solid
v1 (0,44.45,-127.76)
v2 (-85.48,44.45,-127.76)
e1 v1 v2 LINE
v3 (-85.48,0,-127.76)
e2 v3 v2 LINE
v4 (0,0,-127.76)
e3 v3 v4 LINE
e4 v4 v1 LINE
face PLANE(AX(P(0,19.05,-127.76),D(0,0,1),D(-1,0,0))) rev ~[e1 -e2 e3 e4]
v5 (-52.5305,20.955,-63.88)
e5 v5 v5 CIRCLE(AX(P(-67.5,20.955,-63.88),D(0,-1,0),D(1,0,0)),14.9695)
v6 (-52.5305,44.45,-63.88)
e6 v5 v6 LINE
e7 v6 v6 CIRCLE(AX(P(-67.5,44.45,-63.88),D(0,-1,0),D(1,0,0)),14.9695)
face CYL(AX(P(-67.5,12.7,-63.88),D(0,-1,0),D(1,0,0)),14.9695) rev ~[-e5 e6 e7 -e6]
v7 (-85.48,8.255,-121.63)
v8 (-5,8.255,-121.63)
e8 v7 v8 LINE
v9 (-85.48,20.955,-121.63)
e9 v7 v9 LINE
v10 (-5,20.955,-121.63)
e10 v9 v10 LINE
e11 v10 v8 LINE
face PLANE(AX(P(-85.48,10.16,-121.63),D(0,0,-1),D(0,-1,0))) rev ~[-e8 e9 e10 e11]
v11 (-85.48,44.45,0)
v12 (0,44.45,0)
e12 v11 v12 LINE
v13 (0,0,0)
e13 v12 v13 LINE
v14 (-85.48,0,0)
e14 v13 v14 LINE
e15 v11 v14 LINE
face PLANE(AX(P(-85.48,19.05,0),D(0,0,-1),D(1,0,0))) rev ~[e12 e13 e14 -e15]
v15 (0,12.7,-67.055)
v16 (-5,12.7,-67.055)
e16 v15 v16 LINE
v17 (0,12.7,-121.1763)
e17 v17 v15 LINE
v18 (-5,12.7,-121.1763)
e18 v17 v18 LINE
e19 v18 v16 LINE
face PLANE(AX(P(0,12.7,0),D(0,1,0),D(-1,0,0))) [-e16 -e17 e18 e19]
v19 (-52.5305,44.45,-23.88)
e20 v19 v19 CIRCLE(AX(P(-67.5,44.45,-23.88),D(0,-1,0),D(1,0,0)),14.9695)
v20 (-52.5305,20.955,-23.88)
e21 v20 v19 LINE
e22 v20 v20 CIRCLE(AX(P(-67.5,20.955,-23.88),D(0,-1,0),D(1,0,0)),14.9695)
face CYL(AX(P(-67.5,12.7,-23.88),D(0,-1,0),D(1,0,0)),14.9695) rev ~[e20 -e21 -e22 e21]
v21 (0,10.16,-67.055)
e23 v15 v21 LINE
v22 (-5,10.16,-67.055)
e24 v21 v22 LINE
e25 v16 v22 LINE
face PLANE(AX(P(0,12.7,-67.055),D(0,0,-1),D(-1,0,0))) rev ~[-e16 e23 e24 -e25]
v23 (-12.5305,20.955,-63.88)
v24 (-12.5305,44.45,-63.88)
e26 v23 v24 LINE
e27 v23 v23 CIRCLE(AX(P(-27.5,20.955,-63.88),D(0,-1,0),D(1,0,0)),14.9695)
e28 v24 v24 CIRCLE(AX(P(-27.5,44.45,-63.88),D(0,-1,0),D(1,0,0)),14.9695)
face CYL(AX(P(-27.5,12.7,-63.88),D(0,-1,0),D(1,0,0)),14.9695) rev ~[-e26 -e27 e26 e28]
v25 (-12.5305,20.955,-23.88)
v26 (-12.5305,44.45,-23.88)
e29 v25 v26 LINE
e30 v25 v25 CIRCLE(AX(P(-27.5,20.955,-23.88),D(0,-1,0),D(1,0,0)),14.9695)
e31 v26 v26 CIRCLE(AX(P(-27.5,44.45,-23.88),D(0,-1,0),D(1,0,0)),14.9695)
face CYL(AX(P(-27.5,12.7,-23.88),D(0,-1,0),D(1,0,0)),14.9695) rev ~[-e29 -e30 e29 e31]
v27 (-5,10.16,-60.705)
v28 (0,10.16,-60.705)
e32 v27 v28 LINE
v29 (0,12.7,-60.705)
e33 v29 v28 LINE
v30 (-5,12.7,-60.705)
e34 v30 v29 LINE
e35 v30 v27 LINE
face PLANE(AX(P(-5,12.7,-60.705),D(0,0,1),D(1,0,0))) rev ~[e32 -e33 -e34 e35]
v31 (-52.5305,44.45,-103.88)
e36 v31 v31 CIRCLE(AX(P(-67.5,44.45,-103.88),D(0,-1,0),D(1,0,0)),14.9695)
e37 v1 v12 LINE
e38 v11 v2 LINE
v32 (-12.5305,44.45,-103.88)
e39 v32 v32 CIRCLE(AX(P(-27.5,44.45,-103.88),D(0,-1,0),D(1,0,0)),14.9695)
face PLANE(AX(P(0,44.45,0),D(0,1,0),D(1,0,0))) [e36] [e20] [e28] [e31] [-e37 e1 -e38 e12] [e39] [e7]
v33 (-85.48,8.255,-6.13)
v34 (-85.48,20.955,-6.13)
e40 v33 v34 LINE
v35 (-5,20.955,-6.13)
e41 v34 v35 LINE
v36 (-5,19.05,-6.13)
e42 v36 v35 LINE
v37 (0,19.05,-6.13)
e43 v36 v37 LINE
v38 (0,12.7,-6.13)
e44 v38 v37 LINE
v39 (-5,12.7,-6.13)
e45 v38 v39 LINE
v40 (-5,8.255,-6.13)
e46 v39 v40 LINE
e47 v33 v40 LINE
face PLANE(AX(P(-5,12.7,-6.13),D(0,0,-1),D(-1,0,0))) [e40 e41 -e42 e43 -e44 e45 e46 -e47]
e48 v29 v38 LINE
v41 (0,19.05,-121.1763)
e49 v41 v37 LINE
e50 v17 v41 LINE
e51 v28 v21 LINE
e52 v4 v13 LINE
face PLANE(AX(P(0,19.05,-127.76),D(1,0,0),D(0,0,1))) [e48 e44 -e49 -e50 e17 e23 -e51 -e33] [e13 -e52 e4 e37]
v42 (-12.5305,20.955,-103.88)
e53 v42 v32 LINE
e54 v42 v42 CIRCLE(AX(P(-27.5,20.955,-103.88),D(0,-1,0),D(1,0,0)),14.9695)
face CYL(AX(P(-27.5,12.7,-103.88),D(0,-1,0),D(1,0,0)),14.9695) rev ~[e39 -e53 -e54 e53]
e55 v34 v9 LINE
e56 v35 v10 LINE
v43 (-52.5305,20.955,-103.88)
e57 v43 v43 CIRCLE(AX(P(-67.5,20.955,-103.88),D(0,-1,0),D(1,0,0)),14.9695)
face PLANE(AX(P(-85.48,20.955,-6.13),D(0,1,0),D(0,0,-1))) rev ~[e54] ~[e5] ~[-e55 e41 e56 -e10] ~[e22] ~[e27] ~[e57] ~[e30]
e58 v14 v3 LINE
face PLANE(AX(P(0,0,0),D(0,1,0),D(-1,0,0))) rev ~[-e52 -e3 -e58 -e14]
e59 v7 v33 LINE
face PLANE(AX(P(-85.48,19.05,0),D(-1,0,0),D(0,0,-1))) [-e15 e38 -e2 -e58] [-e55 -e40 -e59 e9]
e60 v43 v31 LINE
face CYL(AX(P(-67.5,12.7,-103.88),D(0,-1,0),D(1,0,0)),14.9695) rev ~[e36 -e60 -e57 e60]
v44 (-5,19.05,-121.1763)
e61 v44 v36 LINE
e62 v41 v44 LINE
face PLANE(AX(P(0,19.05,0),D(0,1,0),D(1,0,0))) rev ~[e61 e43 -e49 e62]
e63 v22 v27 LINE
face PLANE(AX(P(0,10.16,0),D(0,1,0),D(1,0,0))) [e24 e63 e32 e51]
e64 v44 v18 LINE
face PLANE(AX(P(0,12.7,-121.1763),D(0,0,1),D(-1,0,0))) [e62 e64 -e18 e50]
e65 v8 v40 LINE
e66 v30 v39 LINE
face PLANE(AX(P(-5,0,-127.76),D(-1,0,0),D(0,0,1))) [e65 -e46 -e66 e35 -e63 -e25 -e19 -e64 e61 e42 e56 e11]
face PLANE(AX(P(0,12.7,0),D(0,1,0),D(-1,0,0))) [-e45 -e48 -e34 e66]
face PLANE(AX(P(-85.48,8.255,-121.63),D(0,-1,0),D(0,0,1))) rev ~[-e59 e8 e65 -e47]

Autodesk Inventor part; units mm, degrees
ref_plane "YZ Plane" through (0, 0, 0) normal (1, 0, 0) x (0, 1, 0)
ref_plane "XZ Plane" through (0, 0, 0) normal (0, 1, 0) x (-1, 0, 0)
ref_plane "XY Plane" through (0, 0, 0) normal (0, 0, 1) x (1, 0, 0)
sketch "Sketch1" plane through (0, 0, 0) normal (0, 1, 0) x (-1, 0, 0)
  line L0 (0, 0) -> (85.48, 0)
  line L1 (85.48, 0) -> (85.48, -127.76)
  line L2 (85.48, -127.76) -> (0, -127.76)
  line L3 (0, -127.76) -> (0, 0)
  line L4 (0, 0) -> (7.0711, -7.0711)
  line L5 (0, 0) -> (10, 0) construction
  circle A0 centre (7.0711, -7.0711) radius 4.7625
  dimension "d0" = 85.48
  dimension "d1" = 127.76
  dimension "offsetDiag" = 10
  dimension "d3" = 45
  dimension "d4" = 9.525
extrude "Extrusion1" add sketch "Sketch1" along normal blind 12.7 contours L0 L1 L2 L3 | A0
sketch "Sketch3" plane through (0, 12.7, 0) normal (0, 1, 0) x (1, 0, 0)
  line L0 (0, 0) -> (0, 127.76) projected
  line L1 (0, 63.88) -> (-72.5, 63.88)
  line L2 (-140, 121.63) -> (-5, 121.63)
  line L3 (-5, 121.63) -> (-5, 6.13)
  line L4 (-5, 6.13) -> (-140, 6.13)
  line L5 (-140, 6.13) -> (-140, 121.63)
  line L6 (-140, 121.63) -> (-5, 6.13) construction
  line L7 (-5, 121.63) -> (-140, 6.13) construction
  dimension "d23" = 72.5
  dimension "d24" = 135
  dimension "d25" = 115.5
extrude "Extrusion2" cut sketch "Sketch3" against normal blind 2.54
sketch "Sketch4" plane through (0, 12.7, 0) normal (0, 1, 0) x (1, 0, 0)
  line L0 (-5, 121.63) -> (-5, 6.13) projected
  line L1 (5, 67.055) -> (-5, 67.055)
  line L2 (-5, 67.055) -> (-5, 60.705)
  line L3 (-5, 60.705) -> (5, 60.705)
  line L4 (5, 60.705) -> (5, 67.055)
  line L5 (0, 0) -> (0, 127.76) projected
  line L6 (5, 67.055) -> (-5, 60.705) construction
  line L7 (-5, 67.055) -> (5, 60.705) construction
  point P0 (0, 63.88)
  point P1 (0, 60.705)
  point P2 (0, 67.055)
  dimension "d28" = 6.35
extrude "Extrusion3" cut sketch "Sketch4" against normal blind 2.54 contours L1 L5 L3 L0
sketch "Sketch5" plane through (0, 12.7, 0) normal (0, 1, 0) x (1, 0, 0)
  line L0 (0, 67.055) -> (0, 60.705) projected
  line L1 (0, 63.88) -> (-67.5, 63.88)
  circle A0 centre (-67.5, 63.88) radius 13.335
  line L2 (-85.48, 0) -> (0, 0) projected
  line L3 (-70.04, 127.76) -> (-38.29, 127.76)
  line L4 (-38.29, 127.76) -> (-38.29, 0)
  line L5 (-38.29, 0) -> (-70.04, 0)
  line L6 (-70.04, 0) -> (-70.04, 127.76)
  line L7 (-70.04, 127.76) -> (-38.29, 0) construction
  line L8 (-38.29, 127.76) -> (-70.04, 0) construction
  line L9 (-85.48, 121.63) -> (-5, 121.63) projected
  line L10 (-68.5166, 121.63) -> (-38.29, 121.63)
  line L11 (-38.29, 121.63) -> (-38.29, 127.76)
  line L12 (-38.29, 127.76) -> (-68.5166, 127.76)
  line L13 (-68.5166, 127.76) -> (-68.5166, 121.63)
  line L14 (-5, 6.13) -> (-85.48, 6.13) projected
  line L15 (-70.04, 0) -> (-38.29, 0)
  line L16 (-38.29, 0) -> (-38.29, 6.13)
  line L17 (-38.29, 6.13) -> (-70.04, 6.13)
  line L18 (-70.04, 6.13) -> (-70.04, 0)
  circle A1 centre (-67.5, 63.88) radius 14.9695
  point P0 (-54.165, 63.88)
  point P1 (-70.04, 6.13)
  point P2 (-38.29, 121.63)
  dimension "d32" = 26.67
  dimension "d31" = 67.5
  dimension "d33" = 31.75
  dimension "d158" = 29.939
sketch "Sketch22" plane through (0, 12.7, 0) normal (0, 1, 0) x (1, 0, 0)
  line L0 (0, 127.76) -> (-85.48, 127.76) projected
  line L1 (0, 0) -> (0, 127.76) projected
  line L2 (-85.48, 127.76) -> (0, 127.76)
  line L3 (0, 127.76) -> (0, 121.1763)
  line L4 (0, 121.1763) -> (-85.48, 121.1763)
  line L5 (-85.48, 121.1763) -> (-85.48, 127.76)
  line L6 (0, 0) -> (0, 60.705) projected
  line L7 (-5, 6.13) -> (-85.48, 6.13) projected
  line L8 (0, 0) -> (-85.48, 0)
  line L9 (-85.48, 0) -> (-85.48, 6.13)
  line L10 (-85.48, 6.13) -> (0, 6.13)
  line L11 (0, 6.13) -> (0, 0)
extrude "Extrusion16" add sketch "Sketch22" along normal blind 6.35
sketch "Sketch23" plane through (0, 19.05, 0) normal (0, 1, 0) x (1, 0, 0)
  line L0 (0, 127.76) -> (-85.48, 127.76) projected
  line L1 (-85.48, 0) -> (0, 0) projected
  line L2 (-85.48, 127.76) -> (0, 127.76)
  line L3 (0, 127.76) -> (0, 0)
  line L4 (0, 0) -> (-85.48, 0)
  line L5 (-85.48, 0) -> (-85.48, 127.76)
extrude "Extrusion17" add sketch "Sketch23" along normal blind 25.4
extrude "Extrusion18" cut sketch "Sketch5" along normal blind 38.1 contours A1 L6 A0 L1 | L1 A0 L6 A1 | A0 L6 | L6 A0 A1 | L6 A0
pattern_linear "Rectangular Pattern2" count 3 spacing 40 along (0, 0, 1) count 2 spacing 40 along (1, 0, 0) of "Extrusion18" first direction both ways yes
sketch "Sketch24" plane through (-85.48, 0, -127.76) normal (-1, 0, 0) x (0, 0, 1)
  line L0 (121.63, 10.16) -> (6.13, 10.16) projected
  line L1 (63.88, 10.16) -> (63.88, 19.05)
  line L2 (78.8495, 19.05) -> (48.9105, 19.05) projected
  line L3 (6.13, 8.255) -> (121.63, 8.255)
  line L4 (121.63, 8.255) -> (121.63, 20.955)
  line L5 (121.63, 20.955) -> (6.13, 20.955)
  line L6 (6.13, 20.955) -> (6.13, 8.255)
  line L7 (6.13, 8.255) -> (121.63, 20.955) construction
  line L8 (121.63, 8.255) -> (6.13, 20.955) construction
  point P0 (127.76, 0)
  point P1 (63.88, 14.605)
  dimension "d167" = 12.7
extrude "Extrusion19" cut sketch "Sketch24" against normal up to surface (80.48 mm away)
properties part number "StirredVialHolder"
